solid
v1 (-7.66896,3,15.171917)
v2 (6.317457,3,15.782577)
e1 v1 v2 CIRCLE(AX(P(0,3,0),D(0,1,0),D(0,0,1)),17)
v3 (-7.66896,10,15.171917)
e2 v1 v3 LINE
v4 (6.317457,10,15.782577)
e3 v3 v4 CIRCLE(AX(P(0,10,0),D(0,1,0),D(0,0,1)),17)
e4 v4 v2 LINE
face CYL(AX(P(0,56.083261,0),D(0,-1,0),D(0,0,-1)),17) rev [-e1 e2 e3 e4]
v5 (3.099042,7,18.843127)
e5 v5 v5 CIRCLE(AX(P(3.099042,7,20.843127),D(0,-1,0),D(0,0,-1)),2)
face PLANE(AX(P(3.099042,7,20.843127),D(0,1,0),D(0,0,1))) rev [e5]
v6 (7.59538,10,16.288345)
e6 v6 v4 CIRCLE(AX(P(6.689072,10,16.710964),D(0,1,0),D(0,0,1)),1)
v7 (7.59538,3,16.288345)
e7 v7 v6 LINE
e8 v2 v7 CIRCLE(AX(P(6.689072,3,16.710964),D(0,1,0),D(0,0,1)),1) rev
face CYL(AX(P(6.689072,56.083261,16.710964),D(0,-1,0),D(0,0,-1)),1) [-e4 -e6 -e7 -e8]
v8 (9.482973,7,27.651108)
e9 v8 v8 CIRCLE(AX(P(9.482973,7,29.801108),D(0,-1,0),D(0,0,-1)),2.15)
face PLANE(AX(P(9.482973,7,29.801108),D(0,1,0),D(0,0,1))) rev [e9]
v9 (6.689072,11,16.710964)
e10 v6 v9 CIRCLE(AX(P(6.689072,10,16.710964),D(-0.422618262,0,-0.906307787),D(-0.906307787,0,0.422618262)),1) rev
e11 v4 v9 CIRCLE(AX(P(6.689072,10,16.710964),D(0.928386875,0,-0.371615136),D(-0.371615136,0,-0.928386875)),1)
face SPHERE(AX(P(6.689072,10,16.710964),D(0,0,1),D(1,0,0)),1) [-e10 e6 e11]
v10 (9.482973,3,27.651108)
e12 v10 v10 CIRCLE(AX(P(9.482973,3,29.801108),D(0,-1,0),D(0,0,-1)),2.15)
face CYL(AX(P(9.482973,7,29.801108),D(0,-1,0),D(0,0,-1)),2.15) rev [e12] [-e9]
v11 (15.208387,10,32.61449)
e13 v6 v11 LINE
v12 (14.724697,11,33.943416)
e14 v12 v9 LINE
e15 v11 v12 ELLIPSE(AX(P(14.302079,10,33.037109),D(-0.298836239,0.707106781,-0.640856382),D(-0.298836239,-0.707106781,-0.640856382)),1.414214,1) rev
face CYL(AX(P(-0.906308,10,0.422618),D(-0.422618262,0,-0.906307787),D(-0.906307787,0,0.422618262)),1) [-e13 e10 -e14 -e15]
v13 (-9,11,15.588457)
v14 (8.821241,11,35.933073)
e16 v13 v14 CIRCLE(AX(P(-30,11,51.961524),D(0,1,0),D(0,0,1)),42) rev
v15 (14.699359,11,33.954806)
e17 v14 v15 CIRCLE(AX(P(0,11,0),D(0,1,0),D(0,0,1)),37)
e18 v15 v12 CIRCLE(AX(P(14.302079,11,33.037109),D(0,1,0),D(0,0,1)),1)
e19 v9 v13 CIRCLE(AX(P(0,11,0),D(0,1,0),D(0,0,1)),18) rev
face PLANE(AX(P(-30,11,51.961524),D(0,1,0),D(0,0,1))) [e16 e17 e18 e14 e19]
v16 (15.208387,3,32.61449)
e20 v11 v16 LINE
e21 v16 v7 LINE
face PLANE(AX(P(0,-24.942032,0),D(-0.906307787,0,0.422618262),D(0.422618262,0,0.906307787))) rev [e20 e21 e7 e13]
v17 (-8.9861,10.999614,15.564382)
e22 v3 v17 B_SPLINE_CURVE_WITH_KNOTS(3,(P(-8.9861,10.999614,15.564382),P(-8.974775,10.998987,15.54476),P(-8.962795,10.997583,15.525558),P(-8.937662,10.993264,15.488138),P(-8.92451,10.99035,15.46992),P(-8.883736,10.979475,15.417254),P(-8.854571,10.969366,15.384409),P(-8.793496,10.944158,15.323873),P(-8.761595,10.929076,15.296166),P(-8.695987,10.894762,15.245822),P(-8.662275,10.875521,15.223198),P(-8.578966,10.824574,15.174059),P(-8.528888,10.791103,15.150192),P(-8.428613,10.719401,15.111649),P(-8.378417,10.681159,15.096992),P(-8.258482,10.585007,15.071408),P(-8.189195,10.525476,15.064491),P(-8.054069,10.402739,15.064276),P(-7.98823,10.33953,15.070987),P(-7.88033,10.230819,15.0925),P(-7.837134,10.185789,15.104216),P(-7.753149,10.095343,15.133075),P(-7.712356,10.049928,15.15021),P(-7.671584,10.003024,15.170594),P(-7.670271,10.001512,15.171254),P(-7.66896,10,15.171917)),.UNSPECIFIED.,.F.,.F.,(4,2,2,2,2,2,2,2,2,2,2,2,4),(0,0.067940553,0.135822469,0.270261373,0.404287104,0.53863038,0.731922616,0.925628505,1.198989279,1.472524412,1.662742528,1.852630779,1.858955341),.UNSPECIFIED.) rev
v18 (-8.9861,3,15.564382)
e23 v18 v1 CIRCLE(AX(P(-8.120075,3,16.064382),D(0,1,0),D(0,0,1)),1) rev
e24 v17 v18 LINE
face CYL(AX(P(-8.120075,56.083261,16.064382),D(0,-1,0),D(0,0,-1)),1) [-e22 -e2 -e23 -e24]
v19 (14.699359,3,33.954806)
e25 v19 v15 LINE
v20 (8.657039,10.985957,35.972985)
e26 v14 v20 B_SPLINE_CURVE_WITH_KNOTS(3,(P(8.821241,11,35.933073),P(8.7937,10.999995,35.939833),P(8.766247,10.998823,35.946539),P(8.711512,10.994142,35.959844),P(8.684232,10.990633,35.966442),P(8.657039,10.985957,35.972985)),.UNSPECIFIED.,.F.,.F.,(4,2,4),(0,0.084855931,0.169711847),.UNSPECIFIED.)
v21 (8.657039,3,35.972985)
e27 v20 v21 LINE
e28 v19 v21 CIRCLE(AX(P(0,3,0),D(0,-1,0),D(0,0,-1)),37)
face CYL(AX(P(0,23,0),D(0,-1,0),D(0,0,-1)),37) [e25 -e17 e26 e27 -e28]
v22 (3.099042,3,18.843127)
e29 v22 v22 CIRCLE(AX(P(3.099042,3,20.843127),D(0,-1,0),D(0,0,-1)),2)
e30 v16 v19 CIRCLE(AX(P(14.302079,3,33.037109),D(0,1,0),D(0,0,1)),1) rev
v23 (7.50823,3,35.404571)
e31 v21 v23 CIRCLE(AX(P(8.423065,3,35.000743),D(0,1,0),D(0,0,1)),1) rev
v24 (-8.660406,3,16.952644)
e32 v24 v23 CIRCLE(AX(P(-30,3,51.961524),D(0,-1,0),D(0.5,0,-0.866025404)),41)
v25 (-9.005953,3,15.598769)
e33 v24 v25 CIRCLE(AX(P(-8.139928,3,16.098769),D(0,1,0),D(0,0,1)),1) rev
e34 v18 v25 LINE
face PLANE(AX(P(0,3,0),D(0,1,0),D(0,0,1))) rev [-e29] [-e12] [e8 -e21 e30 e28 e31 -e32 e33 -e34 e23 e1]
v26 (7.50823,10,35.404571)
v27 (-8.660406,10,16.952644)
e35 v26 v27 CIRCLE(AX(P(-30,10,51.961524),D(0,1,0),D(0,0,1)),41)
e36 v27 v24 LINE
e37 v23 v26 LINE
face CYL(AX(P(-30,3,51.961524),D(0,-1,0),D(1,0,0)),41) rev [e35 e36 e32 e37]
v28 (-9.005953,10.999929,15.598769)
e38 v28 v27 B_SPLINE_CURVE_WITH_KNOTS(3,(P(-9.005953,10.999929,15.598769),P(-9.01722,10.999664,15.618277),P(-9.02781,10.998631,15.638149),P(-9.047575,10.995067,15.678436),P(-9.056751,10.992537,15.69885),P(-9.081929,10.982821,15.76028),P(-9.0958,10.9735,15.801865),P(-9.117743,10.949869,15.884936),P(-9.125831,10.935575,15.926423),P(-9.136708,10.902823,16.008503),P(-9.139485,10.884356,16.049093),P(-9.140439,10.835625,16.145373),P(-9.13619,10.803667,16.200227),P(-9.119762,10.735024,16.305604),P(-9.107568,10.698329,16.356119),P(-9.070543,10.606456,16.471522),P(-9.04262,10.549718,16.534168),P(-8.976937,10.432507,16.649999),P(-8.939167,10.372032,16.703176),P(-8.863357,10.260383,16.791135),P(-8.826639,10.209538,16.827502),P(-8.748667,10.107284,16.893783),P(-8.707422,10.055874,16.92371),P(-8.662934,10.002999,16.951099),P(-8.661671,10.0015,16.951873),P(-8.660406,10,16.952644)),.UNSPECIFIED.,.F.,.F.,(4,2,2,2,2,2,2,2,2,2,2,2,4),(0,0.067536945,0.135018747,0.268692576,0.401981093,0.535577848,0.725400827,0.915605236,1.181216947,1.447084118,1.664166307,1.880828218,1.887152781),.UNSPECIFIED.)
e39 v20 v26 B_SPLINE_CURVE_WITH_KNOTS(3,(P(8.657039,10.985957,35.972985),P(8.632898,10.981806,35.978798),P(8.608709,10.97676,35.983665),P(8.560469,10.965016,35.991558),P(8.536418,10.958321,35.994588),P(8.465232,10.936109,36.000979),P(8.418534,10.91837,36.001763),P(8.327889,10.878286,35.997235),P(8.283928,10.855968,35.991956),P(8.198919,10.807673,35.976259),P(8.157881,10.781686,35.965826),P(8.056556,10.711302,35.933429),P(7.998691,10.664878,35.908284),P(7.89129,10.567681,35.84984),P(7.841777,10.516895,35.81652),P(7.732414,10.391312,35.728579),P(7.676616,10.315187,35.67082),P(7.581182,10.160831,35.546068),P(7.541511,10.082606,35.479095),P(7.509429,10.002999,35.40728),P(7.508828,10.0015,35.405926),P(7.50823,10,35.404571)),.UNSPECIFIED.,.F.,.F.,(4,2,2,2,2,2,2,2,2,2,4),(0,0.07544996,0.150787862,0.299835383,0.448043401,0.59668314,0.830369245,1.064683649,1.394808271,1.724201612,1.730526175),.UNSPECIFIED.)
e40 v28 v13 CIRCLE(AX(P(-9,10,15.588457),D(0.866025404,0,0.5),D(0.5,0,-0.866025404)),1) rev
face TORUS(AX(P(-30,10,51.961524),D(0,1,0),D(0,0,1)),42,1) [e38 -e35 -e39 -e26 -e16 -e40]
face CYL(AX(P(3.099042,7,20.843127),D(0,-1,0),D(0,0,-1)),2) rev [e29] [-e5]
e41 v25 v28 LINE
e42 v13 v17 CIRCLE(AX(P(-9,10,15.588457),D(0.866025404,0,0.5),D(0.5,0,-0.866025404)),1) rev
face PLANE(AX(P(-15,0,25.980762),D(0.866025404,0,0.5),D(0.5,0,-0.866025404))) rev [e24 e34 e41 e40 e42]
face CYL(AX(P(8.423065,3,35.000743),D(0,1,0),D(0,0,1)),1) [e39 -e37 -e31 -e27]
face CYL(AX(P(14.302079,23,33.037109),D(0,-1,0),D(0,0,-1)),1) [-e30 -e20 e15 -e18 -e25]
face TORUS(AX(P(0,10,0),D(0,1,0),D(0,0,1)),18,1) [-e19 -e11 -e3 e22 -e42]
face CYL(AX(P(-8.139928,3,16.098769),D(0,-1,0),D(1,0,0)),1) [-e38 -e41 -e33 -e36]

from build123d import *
from build123d.topology import SkipClean

# Parameters (mm, degrees)
SWEEP_2_DEPTH        = 3
SKETCH_15_W          = 3
SKETCH_15_H          = 8
SKETCH_17_W          = 3
SKETCH_17_H          = 8
REVOLVE_1_ANGLE      = 60
SKETCH_20_R          = 26.546275206
EXTRUDE_1_DEPTH      = 3
SKETCH_21_R          = 12.5
CUT_EXTRUDE_1_DEPTH  = 10
CUT_EXTRUDE_2_REACH  = 67.765
SKETCH_22_R          = 17
EXTRUDE_START        = 22
SKETCH_23_R          = 16.5
SKETCH_23_R_2        = 12.5
EXTRUDE_2_DEPTH      = 22
SKETCH_24_R          = 70.041464106
CUT_EXTRUDE_3_DEPTH  = 10
SKETCH_27_R          = 3
EXTRUDE_4_DEPTH      = 5
SKETCH_28_R          = 1.4
CUT_EXTRUDE_4_DEPTH  = 66.76473219
EXTRUDE_5_DEPTH      = 15
EXTRUDE_5_DEPTH_BACK = 3
SKETCH_30_R          = 1.4
EXTRUDE_6_DEPTH      = 3
EXTRUDE_9_DEPTH      = 8
SKETCH_34_R          = 1.5
CUT_EXTRUDE_5_DEPTH  = 13
SKETCH_35_R          = 57
SKETCH_35_R_2        = 37
CUT_EXTRUDE_6_DEPTH  = 69.556546004
FILLET_1_R           = 1
SKETCH_36_R          = 1.5
EXTRUDE_10_DEPTH     = 4
SKETCH_37_R          = 2
SKETCH_37_R_2        = 2.15
CUT_EXTRUDE_7_DEPTH  = 4


# Read off the part's stored shape, not the designer's step: 扫描2
with BuildPart() as part:
    # 扫描2 outline → 扫描2 (new body)
    with BuildSketch(Plane(origin=(0, 0, 0), x_dir=(1, 0, 0), z_dir=(0, 1, 0))):
        with BuildLine():
            ThreePointArc((-20, -34.641016151), (-12.679491924, -41.961524227), (-10, -51.961524227))
            Line((-10, -51.961524227), (11, -51.961524227))
            ThreePointArc((11, -51.961524227), (10.470745096, -45.395034193), (8.896644323, -38.998073283))
            ThreePointArc((8.896644323, -38.998073283), (5.963817028, 39.55291249), (-20, -34.641016151))
        make_face()
        with BuildLine():
            ThreePointArc((0, -24.015147002), (-4.46857992, -19.881209566), (-9.5, -16.454482672))
            ThreePointArc((-9.5, -16.454482672), (4.917561857, 18.352590699), (0, -19))
            Line((0, -19), (0, -24.015147002))
        make_face(mode=Mode.SUBTRACT)
    extrude(amount=SWEEP_2_DEPTH)

    # 扫描3: sweep along a path in 草图16
    with BuildLine(Plane(origin=(0, 3, 0), x_dir=(1, 0, 0), z_dir=(0, 1, 0))) as sweep_3_path:
        ThreePointArc((-10, -51.961524227), (-12.679491924, -41.961524227), (-20, -34.641016151))
        ThreePointArc((-20, -34.641016151), (5.963817027, 39.55291249), (8.896644323, -38.998073283))
    # 草图15 → 扫描3 (sweep)
    with BuildSketch(Plane.XY.offset(51.961524227)):
        with Locations((-8.5, 4)):
            Rectangle(SKETCH_15_W, SKETCH_15_H)
    sweep(path=sweep_3_path.line)

    # 草图17 → 旋转1 (revolve)
    with BuildSketch(Plane.XY.offset(51.961524227)):
        with Locations((12.5, 4)):
            Rectangle(SKETCH_17_W, SKETCH_17_H)
    revolve(axis=Axis((-30, 3, 51.961524227), (0, 1, 0)), revolution_arc=REVOLVE_1_ANGLE)

    # 草图20 → 凸台-拉伸1 (add)
    with BuildSketch(Plane(origin=(0, 3, 0), x_dir=(1, 0, 0), z_dir=(0, 1, 0))):
        Circle(SKETCH_20_R)
    extrude(amount=-EXTRUDE_1_DEPTH)

    # 草图21 → 切除-拉伸1 (cut)
    with BuildSketch(Plane(origin=(0, 3, 0), x_dir=(1, 0, 0), z_dir=(0, 1, 0))):
        with Locations(Location((0, 0, 0), (0, 0, 270))):
            Circle(SKETCH_21_R)
    extrude(amount=-CUT_EXTRUDE_1_DEPTH, mode=Mode.SUBTRACT)

    # 草图22 → 切除-拉伸2 (cut, up to next)
    with BuildSketch(Plane(origin=(0, 3, 0), x_dir=(1, 0, 0), z_dir=(0, 1, 0)), mode=Mode.PRIVATE) as cut_extrude_2_sk1:
        Circle(SKETCH_22_R)
    cut_extrude_2_tool1 = extrude(cut_extrude_2_sk1.sketch, amount=CUT_EXTRUDE_2_REACH, mode=Mode.PRIVATE) & part.part
    add(cut_extrude_2_tool1.solids().sort_by_distance((0, 3, 0))[0], mode=Mode.SUBTRACT)

    # 草图23 → 凸台-拉伸2 (add)
    with BuildSketch(Plane(origin=(0, 3, 0), x_dir=(1, 0, 0), z_dir=(0, 1, 0)).offset(EXTRUDE_START)):
        with Locations(Location((0, 0, 0), (0, 0, 270))):
            Circle(SKETCH_23_R)
        with Locations(Location((0, 0, 0), (0, 0, 270))):
            Circle(SKETCH_23_R_2, mode=Mode.SUBTRACT)
    extrude(amount=-EXTRUDE_2_DEPTH)

    # 草图24 → 切除-拉伸3 (cut)
    with BuildSketch(Plane(origin=(0, 3, 0), x_dir=(1, 0, 0), z_dir=(0, 1, 0))):
        Circle(SKETCH_24_R)
    extrude(amount=-CUT_EXTRUDE_3_DEPTH, mode=Mode.SUBTRACT)


with BuildPart() as cut_extrude_3_kept_piece:
    # of the separate pieces the step leaves, the one the design keeps (cut_extrude_3_pieces_kept)
    add(part.part.solids().sort_by_distance((-20, 8, 34.641016151))[0])

    # 草图27 → 凸台-拉伸4 (add)
    with BuildSketch(Plane(origin=(0, 8, 0), x_dir=(1, 0, 0), z_dir=(0, 1, 0))):
        with Locations((0, 40)):
            Circle(SKETCH_27_R)
        with Locations((34.641016151, 20)):
            Circle(SKETCH_27_R)
        with Locations((34.641016151, -20)):
            Circle(SKETCH_27_R)
        with Locations((-34.641016151, -20)):
            Circle(SKETCH_27_R)
        with Locations((-34.641016151, 20)):
            Circle(SKETCH_27_R)
    extrude(amount=-EXTRUDE_4_DEPTH)

    # 草图28 → 切除-拉伸4 (cut, through all)
    with BuildSketch(Plane(origin=(0, 8, 0), x_dir=(1, 0, 0), z_dir=(0, 1, 0))):
        with Locations(Location((0, 40, 0), (0, 0, 270))):
            Circle(SKETCH_28_R)
        with Locations(Location((34.641016151, 20, 0), (0, 0, 270))):
            Circle(SKETCH_28_R)
        with Locations(Location((34.641016151, -20, 0), (0, 0, 270))):
            Circle(SKETCH_28_R)
        with Locations((0, -40)):
            Circle(SKETCH_28_R)
        with Locations(Location((-34.641016151, -20, 0), (0, 0, 270))):
            Circle(SKETCH_28_R)
        with Locations(Location((-34.641016151, 20, 0), (0, 0, 270))):
            Circle(SKETCH_28_R)
    extrude(amount=-CUT_EXTRUDE_4_DEPTH, mode=Mode.SUBTRACT)

    # 草图30 → 凸台-拉伸5 (add, two sides: drawn at the far end of the back side and taken through both)
    # profile 1 of 2: a face of its own
    with BuildSketch(Plane(origin=(0, 8, 0), x_dir=(1, 0, 0), z_dir=(0, 1, 0)).offset(-EXTRUDE_5_DEPTH_BACK)):
        with BuildLine():
            ThreePointArc((-18.5, -32.04293994), (4.216428718, 36.758968006), (10.764012371, -35.399661547))
            Line((10.764012371, -35.399661547), (7.984647891, -36.528879457))
            ThreePointArc((7.984647891, -36.528879457), (10.239101404, -44.09929056), (11, -51.961524227))
            Line((11, -51.961524227), (14, -51.961524227))
            ThreePointArc((14, -51.961524227), (13.446319486, -45.003268476), (11.799212586, -38.220133207))
            ThreePointArc((11.799212586, -38.220133207), (23.753094696, -32.183699172), (33.044643352, -22.539998796))
            ThreePointArc((33.044643352, -22.539998796), (37.239092363, -21.5), (36.042533235, -17.347501204))
            ThreePointArc((36.042533235, -17.347501204), (40, 0), (36.042533235, 17.347501204))
            ThreePointArc((36.042533235, 17.347501204), (37.239092363, 21.5), (33.044643352, 22.539998796))
            ThreePointArc((33.044643352, 22.539998796), (20, 34.641016151), (2.997889883, 39.8875))
            ThreePointArc((2.997889883, 39.8875), (0, 43), (-2.997889883, 39.8875))
            ThreePointArc((-2.997889883, 39.8875), (-20, 34.641016151), (-33.044643352, 22.539998796))
            ThreePointArc((-33.044643352, 22.539998796), (-37.239092363, 21.5), (-36.042533235, 17.347501204))
            ThreePointArc((-36.042533235, 17.347501204), (-40, 0), (-36.042533235, -17.347501204))
            ThreePointArc((-36.042533235, -17.347501204), (-37.239092363, -21.5), (-33.044643352, -22.539998796))
            ThreePointArc((-33.044643352, -22.539998796), (-27.203716701, -29.325037044), (-20, -34.641016151))
            Line((-20, -34.641016151), (-18.5, -32.04293994))
        make_face()
        with Locations(Location((-34.641016151, -20, 0), (0, 0, 270))):
            Circle(SKETCH_30_R, mode=Mode.SUBTRACT)
        with Locations(Location((34.641016151, -20, 0), (0, 0, 270))):
            Circle(SKETCH_30_R, mode=Mode.SUBTRACT)
        with Locations(Location((-34.641016151, 20, 0), (0, 0, 270))):
            Circle(SKETCH_30_R, mode=Mode.SUBTRACT)
        with Locations(Location((0, 40, 0), (0, 0, 270))):
            Circle(SKETCH_30_R, mode=Mode.SUBTRACT)
        with Locations(Location((34.641016151, 20, 0), (0, 0, 270))):
            Circle(SKETCH_30_R, mode=Mode.SUBTRACT)
    # profile 2 of 2: a face of its own
    with BuildSketch(Plane(origin=(0, 8, 0), x_dir=(1, 0, 0), z_dir=(0, 1, 0)).offset(-EXTRUDE_5_DEPTH_BACK)):
        with BuildLine():
            Line((-20, -34.641016151), (-18.5, -32.04293994))
            ThreePointArc((-18.5, -32.04293994), (-10.081415713, -40.461524227), (-7, -51.961524227))
            Line((-7, -51.961524227), (-10, -51.961524227))
            ThreePointArc((-10, -51.961524227), (-12.679491924, -41.961524227), (-20, -34.641016151))
        make_face()
    extrude(amount=EXTRUDE_5_DEPTH + EXTRUDE_5_DEPTH_BACK)

    # 草图31 → 凸台-拉伸6 (add)
    with BuildSketch(Plane(origin=(0, 8, 0), x_dir=(1, 0, 0), z_dir=(0, 1, 0))):
        with BuildLine():
            Line((7.984647891, -36.528879457), (10.764012371, -35.399661547))
            ThreePointArc((10.764012371, -35.399661547), (4.742794362, -24.962667956), (-3.883880218, -16.550391973))
            ThreePointArc((-3.883880218, -16.550391973), (-6.259032022, -15.805838103), (-8.5, -14.722431864))
            Line((-8.5, -14.722431864), (-9.5, -16.454482672))
            ThreePointArc((-9.5, -16.454482672), (0.916967208, -25.033079439), (7.984647891, -36.528879457))
        make_face()
    extrude(amount=EXTRUDE_6_DEPTH)

    # 草图33 → 凸台-拉伸9 (add)
    with BuildSketch(Plane(origin=(0, 11, 0), x_dir=(1, 0, 0), z_dir=(0, 1, 0))):
        with BuildLine():
            Line((15.636875684, -33.53338812), (7.18451045, -15.40723238))
            ThreePointArc((7.18451045, -15.40723238), (1.746494616, -16.910048981), (-3.883880218, -16.550391973))
            ThreePointArc((-3.883880218, -16.550391973), (4.742794362, -24.962667956), (10.764012371, -35.399661547))
            ThreePointArc((10.764012371, -35.399661547), (13.23338455, -34.552532951), (15.636875684, -33.53338812))
        make_face()
    extrude(amount=-EXTRUDE_9_DEPTH)

    # 草图34 → 切除-拉伸5 (cut)
    with BuildSketch(Plane(origin=(0, 11, 0), x_dir=(1, 0, 0), z_dir=(0, 1, 0))):
        with Locations(Location((3.099042165, -20.843126869, 0), (0, 0, 270))):
            Circle(SKETCH_34_R)
        with Locations(Location((9.482973177, -29.801107938, 0), (0, 0, 270))):
            Circle(SKETCH_34_R)
    extrude(amount=-CUT_EXTRUDE_5_DEPTH, mode=Mode.SUBTRACT)

    # 草图35 → 切除-拉伸6 (cut, through all)
    with SkipClean():  # the faces are left unmerged after this step: merging them gives an invalid solid
        with BuildSketch(Plane.XZ.offset(-3)):
            Circle(SKETCH_35_R)
            Circle(SKETCH_35_R_2, mode=Mode.SUBTRACT)
        extrude(amount=-CUT_EXTRUDE_6_DEPTH, mode=Mode.SUBTRACT)

    # 圆角1
    fillet_1_edges = [cut_extrude_3_kept_piece.edges().sort_by_distance(p)[0] for p in [
        (15.636875684, 7, 33.53338812),
        (7.833230134, 7, 36.161312278),
        (7.18451045, 7, 15.40723238),
        (11.410693067, 11, 24.47031025),
        (0.786055573, 11, 24.883511334),
        (-9.5, 5.5, 16.454482672),
        (-8.5, 5.5, 14.722431864),
        (1.746494616, 11, 16.910048981),
    ]]
    fillet(fillet_1_edges, radius=FILLET_1_R - 0.0001)  # a hair under: the kernel refuses the full size

    # 草图36 → 凸台-拉伸10 (add)
    with BuildSketch(Plane(origin=(0, 11, 0), x_dir=(1, 0, 0), z_dir=(0, 1, 0))):
        with Locations(Location((9.482973177, -29.801107938, 0), (0, 0, 270))):
            Circle(SKETCH_36_R)
        with Locations(Location((3.099042165, -20.843126869, 0), (0, 0, 270))):
            Circle(SKETCH_36_R)
    extrude(amount=-EXTRUDE_10_DEPTH)

    # 草图37 → 切除-拉伸7 (cut)
    with BuildSketch(Plane.XZ.offset(-3)):
        with Locations(Location((3.099042165, 20.843126869, 0), (0, 0, 270))):
            Circle(SKETCH_37_R)
        with Locations(Location((9.482973177, 29.801107938, 0), (0, 0, 270))):
            Circle(SKETCH_37_R_2)
    extrude(amount=-CUT_EXTRUDE_7_DEPTH, mode=Mode.SUBTRACT)


solid = cut_extrude_3_kept_piece.part
